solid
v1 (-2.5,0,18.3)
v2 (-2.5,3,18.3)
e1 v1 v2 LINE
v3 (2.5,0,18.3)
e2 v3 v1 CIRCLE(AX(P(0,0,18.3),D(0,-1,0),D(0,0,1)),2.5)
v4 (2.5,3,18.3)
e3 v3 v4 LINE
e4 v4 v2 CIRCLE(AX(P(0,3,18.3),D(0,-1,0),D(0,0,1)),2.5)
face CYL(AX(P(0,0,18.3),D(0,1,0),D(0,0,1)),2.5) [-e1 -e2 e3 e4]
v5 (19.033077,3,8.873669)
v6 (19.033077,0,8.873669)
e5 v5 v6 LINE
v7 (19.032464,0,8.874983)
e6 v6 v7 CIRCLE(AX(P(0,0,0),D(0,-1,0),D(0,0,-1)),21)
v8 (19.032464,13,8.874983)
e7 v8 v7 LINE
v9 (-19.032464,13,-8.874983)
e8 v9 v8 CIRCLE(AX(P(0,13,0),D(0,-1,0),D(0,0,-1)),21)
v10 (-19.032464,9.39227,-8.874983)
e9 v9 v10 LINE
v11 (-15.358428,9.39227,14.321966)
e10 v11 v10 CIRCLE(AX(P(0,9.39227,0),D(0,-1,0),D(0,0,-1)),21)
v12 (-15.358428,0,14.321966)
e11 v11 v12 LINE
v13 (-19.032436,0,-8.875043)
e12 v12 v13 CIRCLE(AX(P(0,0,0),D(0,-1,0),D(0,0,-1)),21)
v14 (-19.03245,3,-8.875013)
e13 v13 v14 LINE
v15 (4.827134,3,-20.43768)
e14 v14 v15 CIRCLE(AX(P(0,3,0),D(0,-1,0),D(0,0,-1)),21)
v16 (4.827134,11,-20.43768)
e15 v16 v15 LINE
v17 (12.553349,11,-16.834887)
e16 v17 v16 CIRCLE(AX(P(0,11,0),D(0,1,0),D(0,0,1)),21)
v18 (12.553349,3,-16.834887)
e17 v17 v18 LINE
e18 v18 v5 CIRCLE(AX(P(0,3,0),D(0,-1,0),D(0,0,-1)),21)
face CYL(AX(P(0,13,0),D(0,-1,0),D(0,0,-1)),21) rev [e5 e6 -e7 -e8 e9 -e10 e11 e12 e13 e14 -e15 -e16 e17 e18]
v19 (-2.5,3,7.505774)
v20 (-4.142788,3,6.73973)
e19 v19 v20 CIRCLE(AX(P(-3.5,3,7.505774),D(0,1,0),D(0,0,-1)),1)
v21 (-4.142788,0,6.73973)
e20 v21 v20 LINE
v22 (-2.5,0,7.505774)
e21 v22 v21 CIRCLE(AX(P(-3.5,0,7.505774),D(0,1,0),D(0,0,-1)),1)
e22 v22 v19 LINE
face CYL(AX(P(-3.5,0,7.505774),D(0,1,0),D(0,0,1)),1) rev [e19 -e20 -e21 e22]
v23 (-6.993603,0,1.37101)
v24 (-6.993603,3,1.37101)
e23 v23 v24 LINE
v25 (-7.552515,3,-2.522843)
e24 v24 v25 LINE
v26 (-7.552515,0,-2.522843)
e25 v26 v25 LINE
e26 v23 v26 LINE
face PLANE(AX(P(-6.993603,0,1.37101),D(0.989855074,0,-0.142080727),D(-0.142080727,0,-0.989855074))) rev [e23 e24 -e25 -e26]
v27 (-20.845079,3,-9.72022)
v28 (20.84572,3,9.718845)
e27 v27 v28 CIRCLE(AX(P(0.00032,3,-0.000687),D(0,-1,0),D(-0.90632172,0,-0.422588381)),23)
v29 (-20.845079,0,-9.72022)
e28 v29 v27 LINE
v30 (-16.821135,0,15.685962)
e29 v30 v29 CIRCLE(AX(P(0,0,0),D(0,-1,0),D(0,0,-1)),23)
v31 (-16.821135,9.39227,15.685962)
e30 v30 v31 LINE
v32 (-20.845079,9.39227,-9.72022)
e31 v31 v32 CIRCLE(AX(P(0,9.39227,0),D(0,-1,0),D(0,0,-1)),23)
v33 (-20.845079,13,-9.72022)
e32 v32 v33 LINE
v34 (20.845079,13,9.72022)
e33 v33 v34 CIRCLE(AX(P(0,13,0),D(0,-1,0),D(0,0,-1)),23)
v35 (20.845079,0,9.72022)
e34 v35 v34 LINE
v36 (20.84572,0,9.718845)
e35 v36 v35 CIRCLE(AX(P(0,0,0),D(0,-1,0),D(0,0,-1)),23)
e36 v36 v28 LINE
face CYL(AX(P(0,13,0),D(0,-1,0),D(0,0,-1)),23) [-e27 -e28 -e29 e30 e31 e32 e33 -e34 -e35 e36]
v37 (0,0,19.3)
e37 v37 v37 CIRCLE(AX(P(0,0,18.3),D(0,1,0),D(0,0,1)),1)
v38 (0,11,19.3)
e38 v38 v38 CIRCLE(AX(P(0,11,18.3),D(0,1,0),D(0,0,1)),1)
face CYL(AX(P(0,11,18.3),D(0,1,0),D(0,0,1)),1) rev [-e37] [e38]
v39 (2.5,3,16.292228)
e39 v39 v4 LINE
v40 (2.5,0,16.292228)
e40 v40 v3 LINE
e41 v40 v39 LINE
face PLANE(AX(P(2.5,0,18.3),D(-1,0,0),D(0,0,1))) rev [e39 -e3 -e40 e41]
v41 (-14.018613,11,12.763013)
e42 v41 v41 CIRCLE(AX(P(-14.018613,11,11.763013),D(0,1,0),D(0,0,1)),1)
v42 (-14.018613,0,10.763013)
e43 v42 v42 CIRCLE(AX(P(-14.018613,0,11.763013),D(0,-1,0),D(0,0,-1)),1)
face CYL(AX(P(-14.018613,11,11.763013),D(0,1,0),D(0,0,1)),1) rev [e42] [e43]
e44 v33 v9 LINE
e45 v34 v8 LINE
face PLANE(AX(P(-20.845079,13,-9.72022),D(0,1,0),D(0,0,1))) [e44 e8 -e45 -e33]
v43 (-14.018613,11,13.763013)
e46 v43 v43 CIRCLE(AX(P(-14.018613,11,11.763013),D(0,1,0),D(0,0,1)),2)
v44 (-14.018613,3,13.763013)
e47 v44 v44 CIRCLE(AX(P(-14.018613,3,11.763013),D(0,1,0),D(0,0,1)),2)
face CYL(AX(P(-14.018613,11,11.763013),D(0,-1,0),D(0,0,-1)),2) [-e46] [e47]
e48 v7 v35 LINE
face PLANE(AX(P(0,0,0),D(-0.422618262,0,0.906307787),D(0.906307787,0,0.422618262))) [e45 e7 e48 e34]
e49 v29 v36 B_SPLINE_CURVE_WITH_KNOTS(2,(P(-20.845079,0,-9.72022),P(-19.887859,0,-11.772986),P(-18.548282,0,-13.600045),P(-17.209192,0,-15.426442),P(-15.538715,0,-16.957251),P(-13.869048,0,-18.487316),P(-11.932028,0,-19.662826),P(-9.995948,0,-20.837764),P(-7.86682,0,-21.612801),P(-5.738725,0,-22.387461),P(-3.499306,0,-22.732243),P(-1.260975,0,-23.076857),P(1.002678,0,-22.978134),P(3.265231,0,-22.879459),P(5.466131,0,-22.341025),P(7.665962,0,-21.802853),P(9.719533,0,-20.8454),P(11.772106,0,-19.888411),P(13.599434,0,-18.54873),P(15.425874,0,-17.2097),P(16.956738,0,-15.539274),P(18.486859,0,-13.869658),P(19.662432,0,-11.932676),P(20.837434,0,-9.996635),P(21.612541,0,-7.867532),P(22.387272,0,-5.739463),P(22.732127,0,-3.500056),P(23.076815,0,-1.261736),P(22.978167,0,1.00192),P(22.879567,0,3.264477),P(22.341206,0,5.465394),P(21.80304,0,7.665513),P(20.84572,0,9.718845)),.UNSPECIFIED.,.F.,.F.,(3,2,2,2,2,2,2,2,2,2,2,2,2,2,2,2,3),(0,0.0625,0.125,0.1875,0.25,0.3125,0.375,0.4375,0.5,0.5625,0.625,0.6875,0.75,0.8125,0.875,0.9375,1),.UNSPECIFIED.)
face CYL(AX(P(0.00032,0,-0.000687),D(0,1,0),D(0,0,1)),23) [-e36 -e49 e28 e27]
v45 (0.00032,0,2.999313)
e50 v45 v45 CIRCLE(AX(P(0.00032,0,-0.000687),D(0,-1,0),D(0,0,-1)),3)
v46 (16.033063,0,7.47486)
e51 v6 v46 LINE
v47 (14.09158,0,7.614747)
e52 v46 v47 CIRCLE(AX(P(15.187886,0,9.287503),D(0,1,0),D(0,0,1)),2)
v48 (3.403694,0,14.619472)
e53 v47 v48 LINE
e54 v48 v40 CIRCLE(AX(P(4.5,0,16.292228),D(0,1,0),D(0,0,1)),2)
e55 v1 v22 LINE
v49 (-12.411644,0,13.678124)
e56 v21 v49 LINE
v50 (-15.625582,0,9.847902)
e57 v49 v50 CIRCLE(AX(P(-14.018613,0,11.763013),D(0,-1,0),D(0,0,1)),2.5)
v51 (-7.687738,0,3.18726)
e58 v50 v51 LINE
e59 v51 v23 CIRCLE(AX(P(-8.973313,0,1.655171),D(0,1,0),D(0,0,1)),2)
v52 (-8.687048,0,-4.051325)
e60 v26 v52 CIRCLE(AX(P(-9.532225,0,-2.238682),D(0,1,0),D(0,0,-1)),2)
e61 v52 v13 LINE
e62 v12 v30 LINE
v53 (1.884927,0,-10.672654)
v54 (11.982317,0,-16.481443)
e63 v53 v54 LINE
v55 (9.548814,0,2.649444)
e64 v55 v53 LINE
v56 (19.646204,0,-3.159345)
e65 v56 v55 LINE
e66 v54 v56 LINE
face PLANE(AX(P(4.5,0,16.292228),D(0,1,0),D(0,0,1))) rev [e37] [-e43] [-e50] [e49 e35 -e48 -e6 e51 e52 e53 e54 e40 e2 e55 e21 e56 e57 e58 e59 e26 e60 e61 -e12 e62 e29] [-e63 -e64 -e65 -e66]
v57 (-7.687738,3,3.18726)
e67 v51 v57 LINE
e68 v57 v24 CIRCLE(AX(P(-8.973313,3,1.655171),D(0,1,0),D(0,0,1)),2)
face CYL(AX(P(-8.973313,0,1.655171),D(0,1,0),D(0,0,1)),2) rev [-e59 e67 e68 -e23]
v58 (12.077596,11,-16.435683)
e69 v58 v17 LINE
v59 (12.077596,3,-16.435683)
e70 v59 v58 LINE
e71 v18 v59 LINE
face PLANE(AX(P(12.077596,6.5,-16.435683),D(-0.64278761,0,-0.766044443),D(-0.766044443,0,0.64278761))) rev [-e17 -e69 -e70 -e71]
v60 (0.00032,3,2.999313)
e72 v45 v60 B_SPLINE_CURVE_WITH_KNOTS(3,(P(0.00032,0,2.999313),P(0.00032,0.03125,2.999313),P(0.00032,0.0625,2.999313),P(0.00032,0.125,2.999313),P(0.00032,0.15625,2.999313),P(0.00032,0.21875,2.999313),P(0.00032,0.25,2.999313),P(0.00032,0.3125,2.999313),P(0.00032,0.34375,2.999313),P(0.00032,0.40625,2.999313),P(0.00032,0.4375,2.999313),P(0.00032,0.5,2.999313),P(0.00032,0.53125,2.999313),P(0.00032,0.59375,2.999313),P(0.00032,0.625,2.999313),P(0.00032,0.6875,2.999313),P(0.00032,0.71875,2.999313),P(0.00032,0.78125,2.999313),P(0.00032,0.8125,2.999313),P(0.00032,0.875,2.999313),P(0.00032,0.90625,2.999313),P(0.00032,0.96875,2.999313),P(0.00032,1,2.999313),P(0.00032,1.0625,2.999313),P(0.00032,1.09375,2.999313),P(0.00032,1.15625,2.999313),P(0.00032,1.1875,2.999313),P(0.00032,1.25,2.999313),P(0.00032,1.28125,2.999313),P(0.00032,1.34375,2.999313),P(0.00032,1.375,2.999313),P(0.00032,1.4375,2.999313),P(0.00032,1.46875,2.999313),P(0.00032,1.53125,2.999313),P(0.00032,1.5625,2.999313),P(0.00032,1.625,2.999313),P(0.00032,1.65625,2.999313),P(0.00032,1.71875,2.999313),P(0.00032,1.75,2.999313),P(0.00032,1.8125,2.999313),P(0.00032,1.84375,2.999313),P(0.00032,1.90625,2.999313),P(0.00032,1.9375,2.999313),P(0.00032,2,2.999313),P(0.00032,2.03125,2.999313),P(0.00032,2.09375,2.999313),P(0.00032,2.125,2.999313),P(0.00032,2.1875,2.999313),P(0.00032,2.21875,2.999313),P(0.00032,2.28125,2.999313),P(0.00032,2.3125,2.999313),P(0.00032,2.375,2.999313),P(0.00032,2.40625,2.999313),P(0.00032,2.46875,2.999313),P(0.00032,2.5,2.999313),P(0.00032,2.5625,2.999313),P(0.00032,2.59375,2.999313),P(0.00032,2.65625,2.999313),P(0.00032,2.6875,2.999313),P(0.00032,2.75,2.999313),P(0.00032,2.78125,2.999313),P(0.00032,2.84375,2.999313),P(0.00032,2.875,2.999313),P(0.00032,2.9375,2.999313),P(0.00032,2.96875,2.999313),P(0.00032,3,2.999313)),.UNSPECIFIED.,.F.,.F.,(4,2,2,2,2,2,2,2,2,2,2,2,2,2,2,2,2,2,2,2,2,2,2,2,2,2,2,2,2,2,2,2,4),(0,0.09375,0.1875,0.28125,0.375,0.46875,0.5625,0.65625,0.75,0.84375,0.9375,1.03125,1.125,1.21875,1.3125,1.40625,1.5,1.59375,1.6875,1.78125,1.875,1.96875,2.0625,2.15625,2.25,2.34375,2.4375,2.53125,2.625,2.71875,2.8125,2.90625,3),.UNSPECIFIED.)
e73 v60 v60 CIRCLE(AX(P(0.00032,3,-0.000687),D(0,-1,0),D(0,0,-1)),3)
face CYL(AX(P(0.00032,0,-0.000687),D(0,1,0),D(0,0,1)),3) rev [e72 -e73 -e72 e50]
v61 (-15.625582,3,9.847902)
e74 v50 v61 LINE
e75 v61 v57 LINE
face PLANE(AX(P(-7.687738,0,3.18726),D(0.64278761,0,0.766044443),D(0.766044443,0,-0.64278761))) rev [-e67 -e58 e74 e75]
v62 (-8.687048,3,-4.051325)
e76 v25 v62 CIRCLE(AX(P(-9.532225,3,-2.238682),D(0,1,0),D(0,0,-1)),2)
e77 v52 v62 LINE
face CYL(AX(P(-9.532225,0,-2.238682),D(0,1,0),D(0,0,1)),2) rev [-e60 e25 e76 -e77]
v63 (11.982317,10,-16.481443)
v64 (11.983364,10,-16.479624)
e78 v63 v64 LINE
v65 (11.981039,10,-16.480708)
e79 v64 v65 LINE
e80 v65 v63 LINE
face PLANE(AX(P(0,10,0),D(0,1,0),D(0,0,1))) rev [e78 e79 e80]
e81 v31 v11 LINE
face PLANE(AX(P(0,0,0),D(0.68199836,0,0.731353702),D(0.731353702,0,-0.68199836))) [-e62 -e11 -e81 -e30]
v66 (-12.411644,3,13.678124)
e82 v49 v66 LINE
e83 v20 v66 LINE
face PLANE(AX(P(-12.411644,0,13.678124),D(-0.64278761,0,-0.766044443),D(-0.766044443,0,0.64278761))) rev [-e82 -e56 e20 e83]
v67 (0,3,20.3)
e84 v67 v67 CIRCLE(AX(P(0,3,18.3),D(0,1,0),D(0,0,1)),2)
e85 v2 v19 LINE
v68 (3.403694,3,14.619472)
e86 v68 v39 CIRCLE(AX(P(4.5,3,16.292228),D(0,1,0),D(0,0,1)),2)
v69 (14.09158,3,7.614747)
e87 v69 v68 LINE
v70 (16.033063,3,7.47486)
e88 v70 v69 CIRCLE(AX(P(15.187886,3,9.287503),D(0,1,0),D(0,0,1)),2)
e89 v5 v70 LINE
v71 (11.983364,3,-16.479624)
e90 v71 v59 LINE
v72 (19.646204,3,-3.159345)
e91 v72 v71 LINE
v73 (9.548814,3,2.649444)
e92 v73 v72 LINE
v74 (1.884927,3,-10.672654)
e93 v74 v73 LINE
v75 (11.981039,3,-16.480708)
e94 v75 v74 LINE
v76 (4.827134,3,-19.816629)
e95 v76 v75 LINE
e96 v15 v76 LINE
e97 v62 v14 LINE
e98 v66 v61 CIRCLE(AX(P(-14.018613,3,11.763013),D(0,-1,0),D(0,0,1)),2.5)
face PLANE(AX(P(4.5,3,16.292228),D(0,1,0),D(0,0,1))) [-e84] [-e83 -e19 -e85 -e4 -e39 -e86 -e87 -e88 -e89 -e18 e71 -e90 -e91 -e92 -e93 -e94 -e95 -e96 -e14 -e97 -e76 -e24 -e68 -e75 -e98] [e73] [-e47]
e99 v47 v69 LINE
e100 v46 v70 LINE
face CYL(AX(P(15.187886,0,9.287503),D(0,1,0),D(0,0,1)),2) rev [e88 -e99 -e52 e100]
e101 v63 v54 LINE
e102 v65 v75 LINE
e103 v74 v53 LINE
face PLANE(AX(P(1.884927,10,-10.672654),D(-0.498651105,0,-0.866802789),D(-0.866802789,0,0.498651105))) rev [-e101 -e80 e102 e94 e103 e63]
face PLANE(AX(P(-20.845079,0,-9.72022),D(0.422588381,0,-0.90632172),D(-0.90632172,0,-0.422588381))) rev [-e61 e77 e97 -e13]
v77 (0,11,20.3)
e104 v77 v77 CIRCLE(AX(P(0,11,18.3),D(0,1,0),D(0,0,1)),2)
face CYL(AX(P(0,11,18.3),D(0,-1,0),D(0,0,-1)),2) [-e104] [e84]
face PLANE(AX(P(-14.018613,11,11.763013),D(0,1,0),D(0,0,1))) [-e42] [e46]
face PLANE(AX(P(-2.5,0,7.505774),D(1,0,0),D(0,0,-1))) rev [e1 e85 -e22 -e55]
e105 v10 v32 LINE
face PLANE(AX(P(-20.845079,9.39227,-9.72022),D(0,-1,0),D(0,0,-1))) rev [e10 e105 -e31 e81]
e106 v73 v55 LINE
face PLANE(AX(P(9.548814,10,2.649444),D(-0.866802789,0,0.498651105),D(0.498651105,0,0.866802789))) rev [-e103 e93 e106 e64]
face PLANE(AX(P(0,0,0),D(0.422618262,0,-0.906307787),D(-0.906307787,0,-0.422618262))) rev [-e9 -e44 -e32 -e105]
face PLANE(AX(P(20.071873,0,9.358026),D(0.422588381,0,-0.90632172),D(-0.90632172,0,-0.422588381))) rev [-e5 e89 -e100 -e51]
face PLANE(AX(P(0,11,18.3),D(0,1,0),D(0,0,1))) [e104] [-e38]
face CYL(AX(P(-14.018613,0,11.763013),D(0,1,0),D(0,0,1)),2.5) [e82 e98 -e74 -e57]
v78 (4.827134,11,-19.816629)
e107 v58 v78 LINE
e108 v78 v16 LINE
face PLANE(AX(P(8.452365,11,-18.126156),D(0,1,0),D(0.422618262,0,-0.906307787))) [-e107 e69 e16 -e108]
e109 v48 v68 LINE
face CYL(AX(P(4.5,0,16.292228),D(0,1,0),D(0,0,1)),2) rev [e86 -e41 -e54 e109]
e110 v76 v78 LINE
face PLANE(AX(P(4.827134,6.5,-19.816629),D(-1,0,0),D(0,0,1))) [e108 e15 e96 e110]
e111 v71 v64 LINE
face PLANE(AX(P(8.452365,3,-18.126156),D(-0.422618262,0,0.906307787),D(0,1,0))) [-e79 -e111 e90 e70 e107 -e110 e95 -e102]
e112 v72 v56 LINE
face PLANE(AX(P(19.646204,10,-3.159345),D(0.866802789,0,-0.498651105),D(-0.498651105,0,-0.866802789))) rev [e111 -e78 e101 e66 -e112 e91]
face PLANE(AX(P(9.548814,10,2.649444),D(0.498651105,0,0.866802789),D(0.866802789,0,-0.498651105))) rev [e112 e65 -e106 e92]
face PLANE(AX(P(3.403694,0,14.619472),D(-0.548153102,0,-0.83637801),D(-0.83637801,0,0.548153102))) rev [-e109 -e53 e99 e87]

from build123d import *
from build123d.topology import SkipClean

# Parameters (mm, degrees)
SKETCH_1_W          = 10
SKETCH_1_H          = 2
REVOLVE_1_ANGLE     = 180
SKETCH_2_R          = 3
EXTRUDE_1_DEPTH     = 3
SKETCH_3_R          = 2
EXTRUDE_2_DEPTH     = 8
SKETCH_4_R          = 2
EXTRUDE_3_DEPTH     = 8
HOLE_WIZARD_1_D     = 2
HOLE_WIZARD_1_DEPTH = 8
RIB_START           = 3
RIB_1_DEPTH         = 8
SKETCH_8_R          = 1
CUT_EXTRUDE_1_DEPTH = 10
CUT_EXTRUDE_START   = -11
SKETCH_9_R          = 1
CUT_EXTRUDE_2_DEPTH = 11
SKETCH_10_W         = 2
SKETCH_10_H         = 9.392270145
SKETCH_11_W         = 2
SKETCH_11_H         = 9.392270145
CUT_REVOLVE_2_ANGLE = 112
CUT_EXTRUDE_4_DEPTH = 10


# Read off the part's stored shape, not the designer's step: 筋1
with BuildPart() as part:
    # 草图1 → 旋转1 (revolve)
    with BuildSketch(Plane(origin=(0, 0, 0), x_dir=(0, -1, 0), z_dir=(-0.422618261740697, 0, 0.9063077870366512))):
        with Locations((-8, 22)):
            Rectangle(SKETCH_1_W, SKETCH_1_H)
    revolve(axis=Axis((0, 13, 0), (0, 1, 0)), revolution_arc=REVOLVE_1_ANGLE)

    # 草图2 → 凸台-拉伸1 (add)
    with BuildSketch(Plane.XZ.offset(-3)):
        with BuildLine():
            Line((-7.687738047, 3.187259937), (-15.625582333, 9.847902149))
            ThreePointArc((-15.625582333, 9.847902149), (-15.933724417, 13.369982281), (-12.411644285, 13.678124365))
            Line((-12.411644285, 13.678124365), (-4.14278761, 6.739729779))
            ThreePointArc((-4.14278761, 6.739729779), (-3.077381738, 6.599466435), (-2.5, 7.505774222))
            Line((-2.5, 7.505774222), (-2.5, 18.3))
            ThreePointArc((-2.5, 18.3), (0, 20.8), (2.5, 18.3))
            Line((2.5, 18.3), (2.5, 16.292228073))
            ThreePointArc((2.5, 16.292228073), (2.740367594, 15.341599967), (3.403693795, 14.619472052))
            Line((3.403693795, 14.619472052), (10.364457725, 10.057462653))
            Line((10.364457725, 10.057462653), (14.091579804, 7.614747152))
            ThreePointArc((14.091579804, 7.614747152), (15.044154935, 7.292674514), (16.033062771, 7.474859732))
            Line((16.033062771, 7.474859732), (20.071872558, 9.358025555))
            Line((20.071872558, 9.358025555), (20.845720003, 9.718845484))
            ThreePointArc((20.845720003, 9.718845484), (9.719853203, -20.84608682), (-20.845079102, -9.72022002))
            Line((-20.845079102, -9.72022002), (-8.687048035, -4.051325027))
            ThreePointArc((-8.687048035, -4.051325027), (-7.926279341, -3.430713127), (-7.552514649, -2.522843041))
            Line((-7.552514649, -2.522843041), (-6.993603119, 1.371009596))
            ThreePointArc((-6.993603119, 1.371009596), (-7.105101968, 2.369164428), (-7.687738047, 3.187259937))
        make_face()
        with Locations(Location((0.000320451, -0.000687268, 0), (0, 0, 90))):
            Circle(SKETCH_2_R, mode=Mode.SUBTRACT)
    extrude(amount=EXTRUDE_1_DEPTH)

    # 草图3 → 凸台-拉伸2 (add)
    with BuildSketch(Plane(origin=(0, 3, 0), x_dir=(-1, 0, 0), z_dir=(0, 1, 0))):
        with Locations(Location((14.018613309, 11.763013257, 0), (0, 0, 90))):
            Circle(SKETCH_3_R)
    extrude(amount=EXTRUDE_2_DEPTH)

    # 草图4 → 凸台-拉伸3 (add)
    with BuildSketch(Plane(origin=(0, 3, 0), x_dir=(-1, 0, 0), z_dir=(0, 1, 0))):
        with Locations(Location((0, 18.3, 0), (0, 0, 90))):
            Circle(SKETCH_4_R)
    extrude(amount=EXTRUDE_3_DEPTH)

    # 孔1
    with Locations(Plane(origin=(0, 11, 0), x_dir=(1, 0, 0), z_dir=(0, 1, 0))):
        with Locations((0, -18.3), (-14.018613309, -11.763013257)):
            Hole(HOLE_WIZARD_1_D / 2, depth=HOLE_WIZARD_1_DEPTH)

    # 筋1 outline → 筋1 (add)
    with BuildSketch(Plane(origin=(0, 0, 0), x_dir=(1, 0, 0), z_dir=(0, 1, 0)).offset(RIB_START)):
        with BuildLine():
            ThreePointArc((12.553349452, 16.834886918), (8.874983497, 19.032463528), (4.827134087, 20.437680312))
            Line((4.827134087, 20.437680312), (4.827134087, 19.816628788))
            Line((4.827134087, 19.816628788), (12.077596383, 16.435682694))
            Line((12.077596383, 16.435682694), (12.553349452, 16.834886918))
        make_face()
    extrude(amount=RIB_1_DEPTH)

    # 草图8 → 切除-拉伸1 (cut)
    with BuildSketch(Plane.XZ):
        with Locations(Location((-14.018613309, 11.763013257, 0), (0, 0, 90))):
            Circle(SKETCH_8_R)
    extrude(amount=-CUT_EXTRUDE_1_DEPTH, mode=Mode.SUBTRACT)

    # 草图9 → 切除-拉伸2 (cut)
    with BuildSketch(Plane(origin=(0, 11, 0), x_dir=(1, 0, 0), z_dir=(0, 1, 0)).offset(CUT_EXTRUDE_START)):
        with Locations(Location((0, -18.3, 0), (0, 0, 270))):
            Circle(SKETCH_9_R)
    extrude(amount=CUT_EXTRUDE_2_DEPTH, mode=Mode.SUBTRACT)

    # 草图10 → 旋转15 (revolve)
    with SkipClean():  # the faces are left unmerged after this step: merging them gives an invalid solid
        with BuildSketch(Plane(origin=(0, 0, 0), x_dir=(0.9063077870366516, 0, 0.4226182617406962), z_dir=(-0.4226182617406962, 0, 0.9063077870366516)), mode=Mode.PRIVATE) as revolve_15_sk:
            with Locations((-22, 4.696135073)):
                Rectangle(SKETCH_10_W, SKETCH_10_H)
        revolve(revolve_15_sk.sketch.rotate(Axis((0, 0, 0), (0, 1, 0)), 281.710962798), axis=Axis((0, 0, 0), (0, 1, 0)))

    # 草图11 → 切除-旋转2 (revolve, cut)
    with BuildSketch(Plane(origin=(0, 0, 0), x_dir=(0.9063077870366513, 0, 0.42261826174069694), z_dir=(-0.42261826174069694, 0, 0.9063077870366513))):
        with Locations((22, 4.696135073)):
            Rectangle(SKETCH_11_W, SKETCH_11_H)
    revolve(axis=Axis((0, 0, 0), (0, -1, 0)), revolution_arc=CUT_REVOLVE_2_ANGLE, mode=Mode.SUBTRACT)

    # 草图12 → 切除-拉伸4 (cut)
    with BuildSketch(Plane.XZ):
        Polygon((9.548814336, 2.649444135), (1.884926874, -10.672654147), (11.982316999, -16.481443418), (19.646204461, -3.159345136), align=None)
    extrude(amount=-CUT_EXTRUDE_4_DEPTH, mode=Mode.SUBTRACT)


solid = part.part
